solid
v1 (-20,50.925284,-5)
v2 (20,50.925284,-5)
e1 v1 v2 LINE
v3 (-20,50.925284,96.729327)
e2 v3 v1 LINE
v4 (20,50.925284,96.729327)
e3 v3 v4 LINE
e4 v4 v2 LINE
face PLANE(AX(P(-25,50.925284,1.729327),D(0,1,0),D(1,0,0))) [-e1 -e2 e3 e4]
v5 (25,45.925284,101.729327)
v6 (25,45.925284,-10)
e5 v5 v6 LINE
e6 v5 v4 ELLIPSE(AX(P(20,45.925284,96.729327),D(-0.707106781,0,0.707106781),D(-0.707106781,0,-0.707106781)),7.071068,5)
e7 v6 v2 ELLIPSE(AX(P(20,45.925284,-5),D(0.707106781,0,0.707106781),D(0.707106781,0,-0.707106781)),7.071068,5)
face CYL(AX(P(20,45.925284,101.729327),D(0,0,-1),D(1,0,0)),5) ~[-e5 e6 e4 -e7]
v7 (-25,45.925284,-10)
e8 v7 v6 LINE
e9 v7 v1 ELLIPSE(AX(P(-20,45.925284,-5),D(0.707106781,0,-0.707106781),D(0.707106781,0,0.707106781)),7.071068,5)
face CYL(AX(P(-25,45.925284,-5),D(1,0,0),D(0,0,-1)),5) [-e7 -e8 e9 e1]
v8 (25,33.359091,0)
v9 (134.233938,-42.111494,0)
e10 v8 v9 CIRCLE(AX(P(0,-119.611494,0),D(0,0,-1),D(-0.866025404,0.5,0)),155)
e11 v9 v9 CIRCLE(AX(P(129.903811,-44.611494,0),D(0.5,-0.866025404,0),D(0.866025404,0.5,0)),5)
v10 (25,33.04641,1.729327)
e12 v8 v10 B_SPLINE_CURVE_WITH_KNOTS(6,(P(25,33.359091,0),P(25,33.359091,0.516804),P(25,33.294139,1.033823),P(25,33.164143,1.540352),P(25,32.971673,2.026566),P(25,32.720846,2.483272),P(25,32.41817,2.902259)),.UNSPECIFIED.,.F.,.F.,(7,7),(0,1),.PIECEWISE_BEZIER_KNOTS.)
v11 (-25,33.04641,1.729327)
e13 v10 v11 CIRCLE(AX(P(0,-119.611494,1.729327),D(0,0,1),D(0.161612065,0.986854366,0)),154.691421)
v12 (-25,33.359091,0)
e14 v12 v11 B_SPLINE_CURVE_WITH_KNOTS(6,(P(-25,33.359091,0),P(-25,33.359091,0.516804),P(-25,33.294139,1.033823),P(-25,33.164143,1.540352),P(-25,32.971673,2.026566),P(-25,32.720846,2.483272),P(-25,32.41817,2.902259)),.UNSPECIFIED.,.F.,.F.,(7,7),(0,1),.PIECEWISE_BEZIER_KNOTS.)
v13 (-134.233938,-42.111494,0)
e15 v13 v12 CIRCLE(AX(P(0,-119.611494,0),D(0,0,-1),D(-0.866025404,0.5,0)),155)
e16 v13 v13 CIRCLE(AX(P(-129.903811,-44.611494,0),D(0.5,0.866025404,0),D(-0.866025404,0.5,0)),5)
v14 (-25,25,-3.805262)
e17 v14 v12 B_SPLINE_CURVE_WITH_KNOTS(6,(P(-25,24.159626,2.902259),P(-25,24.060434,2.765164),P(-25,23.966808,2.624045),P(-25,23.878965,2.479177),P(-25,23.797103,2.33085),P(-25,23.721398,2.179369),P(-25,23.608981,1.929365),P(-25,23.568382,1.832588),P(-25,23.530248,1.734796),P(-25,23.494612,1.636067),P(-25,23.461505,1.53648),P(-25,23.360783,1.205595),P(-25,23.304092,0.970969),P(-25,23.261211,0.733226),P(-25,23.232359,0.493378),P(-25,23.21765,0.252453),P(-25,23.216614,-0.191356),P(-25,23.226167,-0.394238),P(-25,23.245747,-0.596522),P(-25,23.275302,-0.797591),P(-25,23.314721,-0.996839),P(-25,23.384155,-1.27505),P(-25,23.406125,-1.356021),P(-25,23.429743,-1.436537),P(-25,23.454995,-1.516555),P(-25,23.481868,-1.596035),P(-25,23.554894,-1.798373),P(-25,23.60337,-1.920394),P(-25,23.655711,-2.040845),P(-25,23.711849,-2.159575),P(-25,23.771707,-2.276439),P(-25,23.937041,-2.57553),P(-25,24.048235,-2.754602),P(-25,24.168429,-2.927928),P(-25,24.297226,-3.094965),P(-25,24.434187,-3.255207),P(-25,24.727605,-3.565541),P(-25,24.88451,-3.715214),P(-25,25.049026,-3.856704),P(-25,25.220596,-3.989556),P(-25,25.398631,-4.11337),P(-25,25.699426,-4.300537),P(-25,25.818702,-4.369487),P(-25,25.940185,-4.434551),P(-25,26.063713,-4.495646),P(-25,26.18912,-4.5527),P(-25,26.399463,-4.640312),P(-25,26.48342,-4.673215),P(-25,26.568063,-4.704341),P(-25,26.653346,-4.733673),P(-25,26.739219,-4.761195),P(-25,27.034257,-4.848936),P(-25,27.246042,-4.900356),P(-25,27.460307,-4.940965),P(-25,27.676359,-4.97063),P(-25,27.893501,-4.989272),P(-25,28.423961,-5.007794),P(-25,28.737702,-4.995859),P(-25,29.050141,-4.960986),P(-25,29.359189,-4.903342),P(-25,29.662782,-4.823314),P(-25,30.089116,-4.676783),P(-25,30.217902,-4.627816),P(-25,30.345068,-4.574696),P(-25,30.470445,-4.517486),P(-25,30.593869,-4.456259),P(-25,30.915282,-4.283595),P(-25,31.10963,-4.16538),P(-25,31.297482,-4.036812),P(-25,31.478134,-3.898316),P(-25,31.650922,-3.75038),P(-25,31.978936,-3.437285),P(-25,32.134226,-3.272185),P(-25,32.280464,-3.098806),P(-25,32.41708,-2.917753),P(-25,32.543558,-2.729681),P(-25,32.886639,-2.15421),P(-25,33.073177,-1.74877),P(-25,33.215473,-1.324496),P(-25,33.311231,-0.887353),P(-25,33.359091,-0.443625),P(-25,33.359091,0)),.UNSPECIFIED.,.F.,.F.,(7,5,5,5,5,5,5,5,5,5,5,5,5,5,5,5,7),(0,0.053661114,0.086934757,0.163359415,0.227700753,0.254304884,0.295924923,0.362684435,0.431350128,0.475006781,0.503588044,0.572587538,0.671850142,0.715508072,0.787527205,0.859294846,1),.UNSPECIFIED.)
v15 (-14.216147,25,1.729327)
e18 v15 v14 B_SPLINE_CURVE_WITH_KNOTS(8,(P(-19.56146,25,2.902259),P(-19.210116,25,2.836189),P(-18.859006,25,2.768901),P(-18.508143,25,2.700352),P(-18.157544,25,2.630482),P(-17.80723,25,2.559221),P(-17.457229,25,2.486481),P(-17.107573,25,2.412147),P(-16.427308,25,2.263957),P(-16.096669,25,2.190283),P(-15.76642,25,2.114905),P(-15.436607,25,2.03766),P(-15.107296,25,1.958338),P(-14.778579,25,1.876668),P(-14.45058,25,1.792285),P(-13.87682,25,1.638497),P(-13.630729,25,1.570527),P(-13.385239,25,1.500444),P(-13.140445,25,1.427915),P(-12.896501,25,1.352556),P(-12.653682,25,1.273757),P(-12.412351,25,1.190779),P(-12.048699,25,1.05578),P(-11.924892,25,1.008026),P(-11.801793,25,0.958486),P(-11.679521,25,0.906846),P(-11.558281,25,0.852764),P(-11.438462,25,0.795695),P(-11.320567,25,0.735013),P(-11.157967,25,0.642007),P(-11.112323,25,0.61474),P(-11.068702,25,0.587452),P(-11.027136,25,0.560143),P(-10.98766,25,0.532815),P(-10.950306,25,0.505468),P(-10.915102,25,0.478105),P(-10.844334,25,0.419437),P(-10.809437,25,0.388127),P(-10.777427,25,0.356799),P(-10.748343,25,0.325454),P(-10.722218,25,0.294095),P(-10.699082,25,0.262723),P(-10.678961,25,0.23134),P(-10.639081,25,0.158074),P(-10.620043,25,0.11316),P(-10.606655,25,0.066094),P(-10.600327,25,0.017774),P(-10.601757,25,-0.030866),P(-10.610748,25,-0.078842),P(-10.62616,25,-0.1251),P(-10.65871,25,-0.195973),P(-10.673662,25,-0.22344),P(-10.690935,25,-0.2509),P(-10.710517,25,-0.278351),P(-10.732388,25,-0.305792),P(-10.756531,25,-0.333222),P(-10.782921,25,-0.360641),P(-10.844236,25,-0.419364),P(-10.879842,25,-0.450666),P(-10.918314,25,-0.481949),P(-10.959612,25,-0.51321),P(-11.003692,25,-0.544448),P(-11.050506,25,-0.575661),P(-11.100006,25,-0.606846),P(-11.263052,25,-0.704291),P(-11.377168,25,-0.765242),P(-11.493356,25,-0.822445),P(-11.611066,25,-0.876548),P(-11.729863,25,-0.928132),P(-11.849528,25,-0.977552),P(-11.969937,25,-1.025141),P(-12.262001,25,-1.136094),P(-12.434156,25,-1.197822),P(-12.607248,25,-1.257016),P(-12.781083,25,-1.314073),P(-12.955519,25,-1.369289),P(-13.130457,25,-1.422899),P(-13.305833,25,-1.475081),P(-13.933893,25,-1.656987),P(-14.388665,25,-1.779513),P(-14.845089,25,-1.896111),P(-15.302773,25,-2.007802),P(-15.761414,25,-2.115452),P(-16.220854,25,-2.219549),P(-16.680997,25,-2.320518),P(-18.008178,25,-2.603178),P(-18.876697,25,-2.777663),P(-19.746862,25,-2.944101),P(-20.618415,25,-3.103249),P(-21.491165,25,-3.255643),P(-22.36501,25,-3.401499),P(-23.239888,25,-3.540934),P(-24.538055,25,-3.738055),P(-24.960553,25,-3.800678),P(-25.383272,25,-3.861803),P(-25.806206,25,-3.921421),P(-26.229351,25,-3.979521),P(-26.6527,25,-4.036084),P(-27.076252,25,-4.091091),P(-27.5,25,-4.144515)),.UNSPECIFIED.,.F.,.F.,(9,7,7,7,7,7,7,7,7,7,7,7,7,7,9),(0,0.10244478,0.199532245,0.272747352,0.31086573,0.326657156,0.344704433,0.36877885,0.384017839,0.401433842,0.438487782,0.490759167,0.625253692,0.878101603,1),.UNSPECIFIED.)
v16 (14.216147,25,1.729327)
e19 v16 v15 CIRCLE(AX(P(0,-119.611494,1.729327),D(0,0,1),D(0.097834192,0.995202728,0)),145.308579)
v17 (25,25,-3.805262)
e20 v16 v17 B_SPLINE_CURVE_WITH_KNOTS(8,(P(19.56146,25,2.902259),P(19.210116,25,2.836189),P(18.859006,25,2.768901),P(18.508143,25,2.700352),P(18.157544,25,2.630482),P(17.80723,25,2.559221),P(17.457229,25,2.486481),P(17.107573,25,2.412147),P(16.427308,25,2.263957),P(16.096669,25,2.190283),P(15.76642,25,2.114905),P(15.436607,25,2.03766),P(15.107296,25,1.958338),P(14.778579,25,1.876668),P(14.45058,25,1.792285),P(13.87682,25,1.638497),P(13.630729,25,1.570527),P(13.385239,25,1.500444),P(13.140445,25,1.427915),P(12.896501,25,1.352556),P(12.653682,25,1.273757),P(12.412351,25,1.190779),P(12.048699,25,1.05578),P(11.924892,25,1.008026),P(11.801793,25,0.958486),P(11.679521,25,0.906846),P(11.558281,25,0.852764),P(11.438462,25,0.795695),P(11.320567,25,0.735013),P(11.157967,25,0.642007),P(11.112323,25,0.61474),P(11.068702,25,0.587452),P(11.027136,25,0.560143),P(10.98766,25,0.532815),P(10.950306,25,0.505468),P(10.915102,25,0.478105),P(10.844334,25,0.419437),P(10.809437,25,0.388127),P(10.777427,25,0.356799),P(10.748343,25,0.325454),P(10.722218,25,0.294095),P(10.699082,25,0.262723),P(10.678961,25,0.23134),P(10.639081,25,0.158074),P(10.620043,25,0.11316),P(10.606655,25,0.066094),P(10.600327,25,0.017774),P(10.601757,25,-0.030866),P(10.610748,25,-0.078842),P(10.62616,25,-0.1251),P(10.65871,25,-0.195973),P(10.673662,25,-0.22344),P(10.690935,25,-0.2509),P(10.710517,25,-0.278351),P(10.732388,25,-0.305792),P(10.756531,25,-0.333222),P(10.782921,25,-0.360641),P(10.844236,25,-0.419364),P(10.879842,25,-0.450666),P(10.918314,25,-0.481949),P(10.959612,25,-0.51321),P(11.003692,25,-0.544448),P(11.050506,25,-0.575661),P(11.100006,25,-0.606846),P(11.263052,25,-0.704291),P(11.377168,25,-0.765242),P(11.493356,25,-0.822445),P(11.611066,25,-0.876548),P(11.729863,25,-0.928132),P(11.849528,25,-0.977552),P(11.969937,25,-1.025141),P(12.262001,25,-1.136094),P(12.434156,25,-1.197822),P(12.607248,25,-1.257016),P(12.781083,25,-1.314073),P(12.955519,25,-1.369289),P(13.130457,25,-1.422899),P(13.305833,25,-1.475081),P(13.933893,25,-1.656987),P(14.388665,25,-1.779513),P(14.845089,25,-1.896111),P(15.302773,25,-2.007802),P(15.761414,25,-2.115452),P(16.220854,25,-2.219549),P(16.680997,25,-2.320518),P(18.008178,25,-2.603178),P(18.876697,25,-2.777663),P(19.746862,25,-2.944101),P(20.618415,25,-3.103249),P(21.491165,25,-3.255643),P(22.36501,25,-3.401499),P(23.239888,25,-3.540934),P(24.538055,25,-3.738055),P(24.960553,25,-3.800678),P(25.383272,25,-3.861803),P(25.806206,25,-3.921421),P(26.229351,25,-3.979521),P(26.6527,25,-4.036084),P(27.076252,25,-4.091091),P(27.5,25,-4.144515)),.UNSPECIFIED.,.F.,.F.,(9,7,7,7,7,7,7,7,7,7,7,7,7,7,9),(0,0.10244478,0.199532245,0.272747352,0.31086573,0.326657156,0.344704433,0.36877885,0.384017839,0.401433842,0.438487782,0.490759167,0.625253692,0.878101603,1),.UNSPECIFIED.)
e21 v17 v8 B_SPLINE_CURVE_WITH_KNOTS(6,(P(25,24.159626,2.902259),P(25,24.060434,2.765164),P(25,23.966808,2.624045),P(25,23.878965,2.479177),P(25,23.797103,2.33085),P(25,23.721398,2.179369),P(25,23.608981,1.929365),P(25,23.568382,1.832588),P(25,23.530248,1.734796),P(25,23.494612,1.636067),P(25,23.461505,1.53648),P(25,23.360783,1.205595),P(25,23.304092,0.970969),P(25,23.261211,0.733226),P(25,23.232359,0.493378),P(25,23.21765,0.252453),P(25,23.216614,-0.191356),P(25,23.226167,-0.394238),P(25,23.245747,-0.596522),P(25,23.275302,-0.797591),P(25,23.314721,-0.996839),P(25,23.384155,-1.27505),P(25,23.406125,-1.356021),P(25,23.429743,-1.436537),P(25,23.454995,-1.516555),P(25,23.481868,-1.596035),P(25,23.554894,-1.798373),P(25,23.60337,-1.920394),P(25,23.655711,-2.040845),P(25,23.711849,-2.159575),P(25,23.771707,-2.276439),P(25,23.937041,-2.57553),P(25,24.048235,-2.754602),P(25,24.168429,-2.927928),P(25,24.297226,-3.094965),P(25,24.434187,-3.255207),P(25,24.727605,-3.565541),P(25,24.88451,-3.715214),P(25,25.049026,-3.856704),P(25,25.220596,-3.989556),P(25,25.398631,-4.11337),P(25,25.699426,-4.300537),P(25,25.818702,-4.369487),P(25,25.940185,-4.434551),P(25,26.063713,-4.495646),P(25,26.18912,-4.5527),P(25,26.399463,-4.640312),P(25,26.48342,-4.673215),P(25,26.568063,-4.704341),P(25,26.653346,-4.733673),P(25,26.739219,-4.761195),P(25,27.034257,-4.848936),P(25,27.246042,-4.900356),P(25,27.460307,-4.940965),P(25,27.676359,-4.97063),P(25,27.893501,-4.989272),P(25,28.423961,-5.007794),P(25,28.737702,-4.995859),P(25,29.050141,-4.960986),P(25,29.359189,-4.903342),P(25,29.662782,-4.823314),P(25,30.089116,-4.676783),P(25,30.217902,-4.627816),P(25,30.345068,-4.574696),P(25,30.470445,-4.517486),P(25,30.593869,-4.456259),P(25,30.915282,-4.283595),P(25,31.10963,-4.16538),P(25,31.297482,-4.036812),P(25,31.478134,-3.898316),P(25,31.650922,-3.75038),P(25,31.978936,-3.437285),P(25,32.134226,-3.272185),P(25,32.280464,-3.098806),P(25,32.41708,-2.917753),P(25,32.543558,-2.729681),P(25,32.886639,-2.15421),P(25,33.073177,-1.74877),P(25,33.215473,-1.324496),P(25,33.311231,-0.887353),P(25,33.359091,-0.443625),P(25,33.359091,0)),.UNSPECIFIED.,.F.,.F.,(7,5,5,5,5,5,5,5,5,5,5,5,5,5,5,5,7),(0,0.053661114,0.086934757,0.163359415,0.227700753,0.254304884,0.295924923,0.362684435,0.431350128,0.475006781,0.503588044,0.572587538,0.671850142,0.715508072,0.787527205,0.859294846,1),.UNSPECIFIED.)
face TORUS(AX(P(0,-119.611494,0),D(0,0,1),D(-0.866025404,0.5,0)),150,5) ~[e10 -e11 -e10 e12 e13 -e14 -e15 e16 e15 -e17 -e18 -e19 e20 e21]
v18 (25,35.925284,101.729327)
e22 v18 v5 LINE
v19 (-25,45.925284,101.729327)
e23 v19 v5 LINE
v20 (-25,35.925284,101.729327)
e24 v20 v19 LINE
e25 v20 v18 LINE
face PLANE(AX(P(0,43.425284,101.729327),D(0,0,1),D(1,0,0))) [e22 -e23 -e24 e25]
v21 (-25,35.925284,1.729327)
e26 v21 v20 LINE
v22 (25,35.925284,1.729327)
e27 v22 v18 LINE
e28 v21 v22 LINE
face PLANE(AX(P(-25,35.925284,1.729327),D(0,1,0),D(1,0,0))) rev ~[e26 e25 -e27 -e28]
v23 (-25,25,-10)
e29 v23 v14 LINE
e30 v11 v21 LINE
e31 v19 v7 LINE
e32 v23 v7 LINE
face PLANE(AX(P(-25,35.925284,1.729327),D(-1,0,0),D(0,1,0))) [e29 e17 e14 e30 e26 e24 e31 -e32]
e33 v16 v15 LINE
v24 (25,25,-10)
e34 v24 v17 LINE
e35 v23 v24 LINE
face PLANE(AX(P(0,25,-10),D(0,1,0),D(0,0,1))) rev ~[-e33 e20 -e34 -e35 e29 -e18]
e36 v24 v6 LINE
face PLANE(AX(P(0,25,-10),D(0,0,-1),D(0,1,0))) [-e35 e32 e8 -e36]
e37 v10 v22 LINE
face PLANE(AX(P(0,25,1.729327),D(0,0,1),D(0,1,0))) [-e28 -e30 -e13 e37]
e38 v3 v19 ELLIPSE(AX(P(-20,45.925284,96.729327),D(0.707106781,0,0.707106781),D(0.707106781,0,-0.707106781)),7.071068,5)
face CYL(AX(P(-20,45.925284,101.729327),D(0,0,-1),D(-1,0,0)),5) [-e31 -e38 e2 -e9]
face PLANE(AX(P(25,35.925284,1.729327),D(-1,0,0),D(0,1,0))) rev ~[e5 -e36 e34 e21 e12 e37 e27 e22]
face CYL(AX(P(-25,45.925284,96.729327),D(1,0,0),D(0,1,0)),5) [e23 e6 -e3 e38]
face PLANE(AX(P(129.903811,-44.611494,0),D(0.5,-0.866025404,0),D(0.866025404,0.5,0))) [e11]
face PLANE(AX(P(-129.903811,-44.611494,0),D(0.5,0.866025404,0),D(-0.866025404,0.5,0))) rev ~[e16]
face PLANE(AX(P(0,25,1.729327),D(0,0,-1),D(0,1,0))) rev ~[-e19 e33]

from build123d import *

# Parameters (mm, degrees)
F0_R          = 5
F1_ANGLE_BACK = 60
F1_ANGLE      = 120
F2_W          = 25.9252840082
F2_H          = 11.7293265872
F3_DEPTH      = 25
F3_DEPTH_BACK = 25
F4_W          = 50
F4_H          = 15
F5_DEPTH      = 100
F6_R          = 5


# Not quite as in the source:
# - a feature of the source that left no trace in its solid (it failed there, or was rolled back) is left out


with BuildPart() as f1:
    # F0 (on Right) → F1 (revolve)
    with BuildSketch(Plane.YZ, mode=Mode.PRIVATE) as f1_sk:
        with Locations((30.3885055535, 0)):
            Circle(F0_R)
    revolve(f1_sk.sketch.rotate(Axis((0, -119.6114944465, -16.3725827584), (0, 0, -1)), -F1_ANGLE_BACK), axis=Axis((0, -119.6114944465, -16.3725827584), (0, 0, -1)), revolution_arc=F1_ANGLE)

    # F2 (on Right) → F3 (join, two sides)
    with BuildSketch(Plane.YZ) as f3_sk:
        with Locations((37.9626420041, -4.1353367064)):
            Rectangle(F2_W, F2_H)
    extrude(amount=F3_DEPTH)
    extrude(f3_sk.sketch, amount=-F3_DEPTH_BACK)

    # F4 (on face) → F5 (join)
    with BuildSketch(Plane.XY.offset(1.7293265872)):
        with Locations((0, 43.4252840082)):
            Rectangle(F4_W, F4_H)
    extrude(amount=F5_DEPTH)

    # F6
    f6_edges = [f1.edges().sort_by_distance(p)[0] for p in [
        (0, 50.925284, -10),
        (25, 50.925284, 45.864663),
        (0, 50.925284, 101.729327),
        (-25, 50.925284, 45.864663),
    ]]
    fillet(f6_edges, radius=F6_R)


solid = f1.part
